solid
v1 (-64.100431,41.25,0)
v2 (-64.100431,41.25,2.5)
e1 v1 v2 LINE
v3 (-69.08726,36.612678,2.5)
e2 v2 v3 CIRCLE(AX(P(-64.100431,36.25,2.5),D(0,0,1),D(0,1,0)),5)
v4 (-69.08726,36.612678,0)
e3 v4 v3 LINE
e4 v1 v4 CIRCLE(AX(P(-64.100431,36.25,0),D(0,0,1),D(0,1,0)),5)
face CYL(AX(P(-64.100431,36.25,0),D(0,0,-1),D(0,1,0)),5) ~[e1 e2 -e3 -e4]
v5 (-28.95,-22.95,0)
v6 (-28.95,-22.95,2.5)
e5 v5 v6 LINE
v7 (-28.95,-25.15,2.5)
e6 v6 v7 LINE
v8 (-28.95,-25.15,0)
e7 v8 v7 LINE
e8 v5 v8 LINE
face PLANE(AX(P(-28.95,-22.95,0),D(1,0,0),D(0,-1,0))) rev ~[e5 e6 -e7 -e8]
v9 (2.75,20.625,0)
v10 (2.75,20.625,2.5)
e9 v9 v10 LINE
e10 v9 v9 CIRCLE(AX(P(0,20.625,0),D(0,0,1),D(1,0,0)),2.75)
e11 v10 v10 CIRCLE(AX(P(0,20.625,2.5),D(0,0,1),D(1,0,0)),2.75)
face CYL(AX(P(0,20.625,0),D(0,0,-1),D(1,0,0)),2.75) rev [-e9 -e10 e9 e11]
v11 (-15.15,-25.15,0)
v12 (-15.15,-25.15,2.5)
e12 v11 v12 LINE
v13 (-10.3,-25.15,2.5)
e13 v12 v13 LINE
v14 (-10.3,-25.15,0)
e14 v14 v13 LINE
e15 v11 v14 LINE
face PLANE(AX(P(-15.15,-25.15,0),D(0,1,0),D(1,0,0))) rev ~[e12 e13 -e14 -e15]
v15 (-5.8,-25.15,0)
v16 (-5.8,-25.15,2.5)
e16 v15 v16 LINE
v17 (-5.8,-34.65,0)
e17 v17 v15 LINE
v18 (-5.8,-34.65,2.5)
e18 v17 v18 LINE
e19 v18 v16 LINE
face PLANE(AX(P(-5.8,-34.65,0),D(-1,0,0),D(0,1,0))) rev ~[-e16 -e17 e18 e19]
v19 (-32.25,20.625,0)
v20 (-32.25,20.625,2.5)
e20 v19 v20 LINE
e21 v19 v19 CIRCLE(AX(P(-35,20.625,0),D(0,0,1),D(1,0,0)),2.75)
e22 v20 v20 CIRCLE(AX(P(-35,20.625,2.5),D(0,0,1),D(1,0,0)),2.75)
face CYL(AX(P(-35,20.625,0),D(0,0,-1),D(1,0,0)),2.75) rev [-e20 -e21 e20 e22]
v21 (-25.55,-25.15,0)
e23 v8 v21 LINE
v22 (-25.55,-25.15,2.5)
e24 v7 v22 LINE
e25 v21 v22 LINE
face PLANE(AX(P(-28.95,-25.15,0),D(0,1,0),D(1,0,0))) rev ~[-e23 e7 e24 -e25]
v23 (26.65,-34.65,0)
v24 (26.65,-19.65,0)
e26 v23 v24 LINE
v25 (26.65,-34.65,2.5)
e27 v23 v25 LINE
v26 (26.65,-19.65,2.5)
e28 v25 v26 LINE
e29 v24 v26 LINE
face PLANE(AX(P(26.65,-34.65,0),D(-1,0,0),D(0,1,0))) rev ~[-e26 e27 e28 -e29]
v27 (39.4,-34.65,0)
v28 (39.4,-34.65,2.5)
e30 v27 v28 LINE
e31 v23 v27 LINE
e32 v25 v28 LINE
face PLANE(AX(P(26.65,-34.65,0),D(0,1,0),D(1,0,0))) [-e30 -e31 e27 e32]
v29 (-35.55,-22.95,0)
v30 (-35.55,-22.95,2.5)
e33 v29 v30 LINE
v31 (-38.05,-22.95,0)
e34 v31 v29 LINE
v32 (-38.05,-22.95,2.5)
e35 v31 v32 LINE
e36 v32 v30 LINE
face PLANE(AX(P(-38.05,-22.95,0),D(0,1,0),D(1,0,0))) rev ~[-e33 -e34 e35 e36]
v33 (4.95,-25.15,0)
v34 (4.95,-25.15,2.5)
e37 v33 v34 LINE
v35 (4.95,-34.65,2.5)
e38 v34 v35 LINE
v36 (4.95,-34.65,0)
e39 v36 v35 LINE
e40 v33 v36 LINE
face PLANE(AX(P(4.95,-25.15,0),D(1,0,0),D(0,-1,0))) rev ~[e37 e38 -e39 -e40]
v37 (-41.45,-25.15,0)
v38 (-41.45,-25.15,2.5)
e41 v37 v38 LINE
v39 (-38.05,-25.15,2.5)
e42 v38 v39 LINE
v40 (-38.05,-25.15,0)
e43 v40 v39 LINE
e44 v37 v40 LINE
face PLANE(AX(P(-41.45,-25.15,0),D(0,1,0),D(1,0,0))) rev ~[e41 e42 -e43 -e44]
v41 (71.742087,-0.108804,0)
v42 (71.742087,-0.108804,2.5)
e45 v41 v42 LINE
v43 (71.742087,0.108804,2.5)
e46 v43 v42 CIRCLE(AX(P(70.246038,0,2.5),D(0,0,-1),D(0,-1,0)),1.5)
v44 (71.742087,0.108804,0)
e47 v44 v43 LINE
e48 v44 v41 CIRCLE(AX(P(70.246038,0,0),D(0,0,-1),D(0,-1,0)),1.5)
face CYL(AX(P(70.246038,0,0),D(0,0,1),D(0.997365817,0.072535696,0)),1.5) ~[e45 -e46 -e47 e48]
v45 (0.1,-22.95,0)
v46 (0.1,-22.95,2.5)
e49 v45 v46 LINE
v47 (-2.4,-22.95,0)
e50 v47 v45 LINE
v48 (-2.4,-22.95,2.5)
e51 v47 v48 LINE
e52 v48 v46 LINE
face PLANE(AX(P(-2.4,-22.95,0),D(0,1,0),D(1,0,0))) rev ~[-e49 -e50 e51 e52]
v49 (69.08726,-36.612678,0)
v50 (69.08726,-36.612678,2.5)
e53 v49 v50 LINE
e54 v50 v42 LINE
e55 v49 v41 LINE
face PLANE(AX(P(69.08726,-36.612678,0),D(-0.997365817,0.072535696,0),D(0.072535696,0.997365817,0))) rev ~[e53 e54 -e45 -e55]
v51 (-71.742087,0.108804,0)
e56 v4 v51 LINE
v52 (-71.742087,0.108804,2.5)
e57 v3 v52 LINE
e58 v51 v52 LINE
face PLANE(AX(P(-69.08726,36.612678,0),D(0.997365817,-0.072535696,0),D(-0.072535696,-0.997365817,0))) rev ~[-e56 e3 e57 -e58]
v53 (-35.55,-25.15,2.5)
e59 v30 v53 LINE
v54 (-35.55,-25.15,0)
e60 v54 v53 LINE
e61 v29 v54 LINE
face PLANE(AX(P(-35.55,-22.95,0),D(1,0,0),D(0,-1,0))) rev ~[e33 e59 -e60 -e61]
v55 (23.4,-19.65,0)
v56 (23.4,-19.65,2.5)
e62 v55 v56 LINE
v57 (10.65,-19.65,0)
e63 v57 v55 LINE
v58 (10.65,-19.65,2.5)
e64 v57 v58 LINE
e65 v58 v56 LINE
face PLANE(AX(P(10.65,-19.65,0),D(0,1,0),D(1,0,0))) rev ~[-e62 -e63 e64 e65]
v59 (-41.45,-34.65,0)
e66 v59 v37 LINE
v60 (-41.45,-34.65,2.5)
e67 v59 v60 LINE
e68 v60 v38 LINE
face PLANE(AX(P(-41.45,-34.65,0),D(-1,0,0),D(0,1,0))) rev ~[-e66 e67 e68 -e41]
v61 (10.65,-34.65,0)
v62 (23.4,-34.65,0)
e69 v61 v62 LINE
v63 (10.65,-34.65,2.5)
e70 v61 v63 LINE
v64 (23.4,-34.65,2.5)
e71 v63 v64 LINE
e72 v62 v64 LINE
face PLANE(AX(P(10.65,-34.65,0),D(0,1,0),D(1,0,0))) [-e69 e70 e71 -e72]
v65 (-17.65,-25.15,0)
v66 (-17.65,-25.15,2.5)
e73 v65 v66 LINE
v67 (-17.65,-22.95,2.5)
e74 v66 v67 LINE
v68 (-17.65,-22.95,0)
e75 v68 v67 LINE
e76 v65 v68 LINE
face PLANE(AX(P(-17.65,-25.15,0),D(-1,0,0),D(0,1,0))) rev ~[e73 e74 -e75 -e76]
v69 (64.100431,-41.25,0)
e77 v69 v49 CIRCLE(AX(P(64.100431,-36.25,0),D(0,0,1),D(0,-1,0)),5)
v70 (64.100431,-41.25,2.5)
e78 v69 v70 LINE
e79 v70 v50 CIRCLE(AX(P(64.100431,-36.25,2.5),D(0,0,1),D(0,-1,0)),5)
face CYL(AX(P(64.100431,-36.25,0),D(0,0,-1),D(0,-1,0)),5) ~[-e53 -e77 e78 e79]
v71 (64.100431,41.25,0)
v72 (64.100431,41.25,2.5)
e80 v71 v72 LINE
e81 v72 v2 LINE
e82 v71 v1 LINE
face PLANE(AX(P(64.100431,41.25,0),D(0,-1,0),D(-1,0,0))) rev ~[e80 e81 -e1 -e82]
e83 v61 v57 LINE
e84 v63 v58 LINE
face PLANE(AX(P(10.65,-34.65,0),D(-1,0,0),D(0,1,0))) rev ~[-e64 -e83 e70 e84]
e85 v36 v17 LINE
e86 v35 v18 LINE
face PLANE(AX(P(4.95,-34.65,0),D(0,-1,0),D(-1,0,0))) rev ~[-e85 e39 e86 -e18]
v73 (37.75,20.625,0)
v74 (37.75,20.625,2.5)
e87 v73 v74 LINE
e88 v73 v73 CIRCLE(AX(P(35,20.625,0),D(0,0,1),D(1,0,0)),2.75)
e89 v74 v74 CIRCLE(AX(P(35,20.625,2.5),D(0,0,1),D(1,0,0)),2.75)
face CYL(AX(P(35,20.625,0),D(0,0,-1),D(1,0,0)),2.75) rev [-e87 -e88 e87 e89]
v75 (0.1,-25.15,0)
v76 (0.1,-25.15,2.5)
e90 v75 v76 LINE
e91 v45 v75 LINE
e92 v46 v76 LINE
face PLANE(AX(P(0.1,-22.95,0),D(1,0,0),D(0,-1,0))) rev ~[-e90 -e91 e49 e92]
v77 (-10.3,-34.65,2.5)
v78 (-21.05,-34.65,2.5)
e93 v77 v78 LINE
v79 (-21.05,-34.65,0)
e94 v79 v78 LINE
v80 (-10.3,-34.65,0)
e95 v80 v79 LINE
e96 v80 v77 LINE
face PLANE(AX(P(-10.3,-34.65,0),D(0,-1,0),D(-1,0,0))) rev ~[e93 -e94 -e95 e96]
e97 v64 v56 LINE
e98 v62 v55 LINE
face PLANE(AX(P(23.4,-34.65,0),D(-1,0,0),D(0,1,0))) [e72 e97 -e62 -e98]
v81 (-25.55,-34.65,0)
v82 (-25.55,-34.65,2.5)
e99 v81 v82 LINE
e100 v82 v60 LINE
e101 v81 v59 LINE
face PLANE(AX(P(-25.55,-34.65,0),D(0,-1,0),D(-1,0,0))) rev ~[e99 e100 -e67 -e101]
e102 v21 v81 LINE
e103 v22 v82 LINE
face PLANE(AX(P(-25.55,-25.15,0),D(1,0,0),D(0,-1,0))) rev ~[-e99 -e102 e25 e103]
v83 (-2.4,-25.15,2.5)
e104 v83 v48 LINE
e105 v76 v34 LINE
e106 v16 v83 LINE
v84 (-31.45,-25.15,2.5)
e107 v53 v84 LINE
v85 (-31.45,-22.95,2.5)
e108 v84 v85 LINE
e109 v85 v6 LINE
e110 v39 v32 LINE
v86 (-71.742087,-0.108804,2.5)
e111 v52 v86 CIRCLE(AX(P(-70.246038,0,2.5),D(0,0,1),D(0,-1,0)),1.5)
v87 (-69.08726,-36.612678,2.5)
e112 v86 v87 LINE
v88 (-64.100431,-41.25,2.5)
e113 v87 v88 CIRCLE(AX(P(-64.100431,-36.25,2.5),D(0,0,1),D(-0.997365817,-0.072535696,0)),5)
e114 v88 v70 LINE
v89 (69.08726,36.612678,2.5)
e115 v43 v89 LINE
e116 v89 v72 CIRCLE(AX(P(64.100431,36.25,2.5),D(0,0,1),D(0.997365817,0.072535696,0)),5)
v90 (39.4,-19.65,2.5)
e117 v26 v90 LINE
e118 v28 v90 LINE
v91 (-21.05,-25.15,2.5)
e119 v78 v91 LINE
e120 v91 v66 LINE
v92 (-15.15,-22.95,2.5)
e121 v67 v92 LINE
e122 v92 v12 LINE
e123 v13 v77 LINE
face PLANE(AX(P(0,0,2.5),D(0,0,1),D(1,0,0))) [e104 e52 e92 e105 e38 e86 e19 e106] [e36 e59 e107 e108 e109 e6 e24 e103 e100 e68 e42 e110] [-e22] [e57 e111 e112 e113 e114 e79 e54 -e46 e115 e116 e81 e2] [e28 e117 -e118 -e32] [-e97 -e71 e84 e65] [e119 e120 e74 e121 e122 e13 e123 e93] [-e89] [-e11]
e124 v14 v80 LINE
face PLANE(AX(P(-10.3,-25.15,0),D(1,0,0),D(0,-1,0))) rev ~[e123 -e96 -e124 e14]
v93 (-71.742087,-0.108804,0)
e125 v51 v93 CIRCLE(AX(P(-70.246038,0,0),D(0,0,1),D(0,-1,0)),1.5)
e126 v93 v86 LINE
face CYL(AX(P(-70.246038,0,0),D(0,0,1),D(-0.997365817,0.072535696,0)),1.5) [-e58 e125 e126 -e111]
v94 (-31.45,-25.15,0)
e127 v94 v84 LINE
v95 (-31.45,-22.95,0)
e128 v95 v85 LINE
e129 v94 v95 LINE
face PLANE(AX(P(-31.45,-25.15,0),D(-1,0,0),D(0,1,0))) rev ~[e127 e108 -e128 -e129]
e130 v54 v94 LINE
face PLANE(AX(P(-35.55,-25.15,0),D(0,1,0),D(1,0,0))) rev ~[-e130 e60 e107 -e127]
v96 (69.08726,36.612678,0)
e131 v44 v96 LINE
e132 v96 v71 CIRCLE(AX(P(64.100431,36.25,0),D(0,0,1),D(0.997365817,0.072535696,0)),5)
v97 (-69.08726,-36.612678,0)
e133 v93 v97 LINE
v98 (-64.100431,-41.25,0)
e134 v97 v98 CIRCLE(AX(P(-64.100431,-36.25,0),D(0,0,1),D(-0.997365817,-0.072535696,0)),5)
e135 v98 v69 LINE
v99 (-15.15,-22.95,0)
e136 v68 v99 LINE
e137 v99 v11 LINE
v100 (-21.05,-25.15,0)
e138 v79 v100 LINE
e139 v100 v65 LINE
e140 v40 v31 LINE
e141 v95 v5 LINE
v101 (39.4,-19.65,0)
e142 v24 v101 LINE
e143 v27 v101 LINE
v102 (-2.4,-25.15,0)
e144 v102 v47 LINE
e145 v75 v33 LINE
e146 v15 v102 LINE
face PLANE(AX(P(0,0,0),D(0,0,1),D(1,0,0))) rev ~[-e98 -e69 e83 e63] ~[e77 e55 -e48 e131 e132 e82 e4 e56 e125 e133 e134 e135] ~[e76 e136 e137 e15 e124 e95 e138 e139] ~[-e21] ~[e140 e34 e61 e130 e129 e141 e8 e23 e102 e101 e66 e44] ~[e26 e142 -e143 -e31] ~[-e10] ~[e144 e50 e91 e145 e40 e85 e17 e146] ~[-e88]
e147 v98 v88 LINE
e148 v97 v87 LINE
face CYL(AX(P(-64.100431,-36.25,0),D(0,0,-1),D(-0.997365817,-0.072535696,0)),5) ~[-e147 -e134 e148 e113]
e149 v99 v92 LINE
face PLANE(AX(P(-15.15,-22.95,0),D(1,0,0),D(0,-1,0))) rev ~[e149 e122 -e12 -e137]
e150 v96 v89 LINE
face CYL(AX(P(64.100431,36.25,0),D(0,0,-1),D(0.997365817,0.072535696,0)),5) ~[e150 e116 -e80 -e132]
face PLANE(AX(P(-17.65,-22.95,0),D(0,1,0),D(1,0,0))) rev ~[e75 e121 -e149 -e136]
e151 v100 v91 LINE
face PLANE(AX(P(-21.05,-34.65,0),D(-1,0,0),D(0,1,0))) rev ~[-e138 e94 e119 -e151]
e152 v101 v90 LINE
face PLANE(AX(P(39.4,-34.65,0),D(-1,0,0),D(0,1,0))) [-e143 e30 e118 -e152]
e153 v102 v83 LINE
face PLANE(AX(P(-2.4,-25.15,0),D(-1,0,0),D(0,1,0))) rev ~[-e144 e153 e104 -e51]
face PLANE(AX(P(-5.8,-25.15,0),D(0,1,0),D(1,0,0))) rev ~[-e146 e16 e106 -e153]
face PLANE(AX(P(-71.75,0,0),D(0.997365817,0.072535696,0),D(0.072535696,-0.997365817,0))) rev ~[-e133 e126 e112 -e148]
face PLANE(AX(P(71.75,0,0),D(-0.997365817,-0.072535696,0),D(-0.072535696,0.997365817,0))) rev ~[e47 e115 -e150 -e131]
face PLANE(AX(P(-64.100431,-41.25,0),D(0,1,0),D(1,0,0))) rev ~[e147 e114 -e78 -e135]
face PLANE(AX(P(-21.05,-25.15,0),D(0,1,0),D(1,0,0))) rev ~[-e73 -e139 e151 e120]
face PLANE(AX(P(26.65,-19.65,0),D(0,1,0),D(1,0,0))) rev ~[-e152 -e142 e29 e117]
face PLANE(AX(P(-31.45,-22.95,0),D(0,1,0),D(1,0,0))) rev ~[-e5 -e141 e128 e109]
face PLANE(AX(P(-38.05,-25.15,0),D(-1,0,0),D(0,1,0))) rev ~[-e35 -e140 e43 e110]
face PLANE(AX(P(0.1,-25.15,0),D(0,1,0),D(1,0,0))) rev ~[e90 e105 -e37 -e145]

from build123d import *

# Parameters (mm, degrees)
F0_W     = 12.75
F0_H     = 15
F0_R     = 2.75
F1_DEPTH = 2.5
F2_R     = 1.5


with BuildPart() as f1:
    # F0 (on Top) → F1 (new body)
    with BuildSketch(Plane.XY):
        with BuildLine():
            ThreePointArc((69.087259747, 36.6126784789), (67.5053247579, 39.9115155602), (64.1004306622, 41.25))
            Line((64.1004306622, 41.25), (-64.1004306622, 41.25))
            ThreePointArc((-64.1004306622, 41.25), (-67.5053247579, 39.9115155602), (-69.087259747, 36.6126784789))
            Line((-69.087259747, 36.6126784789), (-71.75, 0))
            Line((-71.75, 0), (-69.087259747, -36.6126784789))
            ThreePointArc((-69.087259747, -36.6126784789), (-67.5053247579, -39.9115155602), (-64.1004306622, -41.25))
            Line((-64.1004306622, -41.25), (64.1004306622, -41.25))
            ThreePointArc((64.1004306622, -41.25), (67.5053247579, -39.9115155602), (69.087259747, -36.6126784789))
            Line((69.087259747, -36.6126784789), (71.75, 0))
            Line((71.75, 0), (69.087259747, 36.6126784789))
        make_face()
        Polygon((-25.55, -25.15), (-25.55, -34.65), (-41.45, -34.65), (-41.45, -25.15), (-38.05, -25.15), (-38.05, -22.95), (-35.55, -22.95), (-35.55, -25.15), (-31.45, -25.15), (-31.45, -22.95), (-28.95, -22.95), (-28.95, -25.15), align=None, mode=Mode.SUBTRACT)
        Polygon((-10.3, -25.15), (-10.3, -34.65), (-21.05, -34.65), (-21.05, -25.15), (-17.65, -25.15), (-17.65, -22.95), (-15.15, -22.95), (-15.15, -25.15), align=None, mode=Mode.SUBTRACT)
        Polygon((4.95, -25.15), (4.95, -34.65), (-5.8, -34.65), (-5.8, -25.15), (-2.4, -25.15), (-2.4, -22.95), (0.1, -22.95), (0.1, -25.15), align=None, mode=Mode.SUBTRACT)
        with Locations((17.025, -27.15)):
            Rectangle(F0_W, F0_H, mode=Mode.SUBTRACT)
        with Locations((33.025, -27.15)):
            Rectangle(F0_W, F0_H, mode=Mode.SUBTRACT)
        with Locations((-35, 20.625)):
            Circle(F0_R, mode=Mode.SUBTRACT)
        with Locations((0, 20.625)):
            Circle(F0_R, mode=Mode.SUBTRACT)
        with Locations((35, 20.625)):
            Circle(F0_R, mode=Mode.SUBTRACT)
    extrude(amount=F1_DEPTH)

    # F2
    f2_edges = [f1.edges().sort_by_distance(p)[0] for p in [
        (-71.75, 0, 1.25),
        (71.75, 0, 1.25),
    ]]
    fillet(f2_edges, radius=F2_R)


solid = f1.part
